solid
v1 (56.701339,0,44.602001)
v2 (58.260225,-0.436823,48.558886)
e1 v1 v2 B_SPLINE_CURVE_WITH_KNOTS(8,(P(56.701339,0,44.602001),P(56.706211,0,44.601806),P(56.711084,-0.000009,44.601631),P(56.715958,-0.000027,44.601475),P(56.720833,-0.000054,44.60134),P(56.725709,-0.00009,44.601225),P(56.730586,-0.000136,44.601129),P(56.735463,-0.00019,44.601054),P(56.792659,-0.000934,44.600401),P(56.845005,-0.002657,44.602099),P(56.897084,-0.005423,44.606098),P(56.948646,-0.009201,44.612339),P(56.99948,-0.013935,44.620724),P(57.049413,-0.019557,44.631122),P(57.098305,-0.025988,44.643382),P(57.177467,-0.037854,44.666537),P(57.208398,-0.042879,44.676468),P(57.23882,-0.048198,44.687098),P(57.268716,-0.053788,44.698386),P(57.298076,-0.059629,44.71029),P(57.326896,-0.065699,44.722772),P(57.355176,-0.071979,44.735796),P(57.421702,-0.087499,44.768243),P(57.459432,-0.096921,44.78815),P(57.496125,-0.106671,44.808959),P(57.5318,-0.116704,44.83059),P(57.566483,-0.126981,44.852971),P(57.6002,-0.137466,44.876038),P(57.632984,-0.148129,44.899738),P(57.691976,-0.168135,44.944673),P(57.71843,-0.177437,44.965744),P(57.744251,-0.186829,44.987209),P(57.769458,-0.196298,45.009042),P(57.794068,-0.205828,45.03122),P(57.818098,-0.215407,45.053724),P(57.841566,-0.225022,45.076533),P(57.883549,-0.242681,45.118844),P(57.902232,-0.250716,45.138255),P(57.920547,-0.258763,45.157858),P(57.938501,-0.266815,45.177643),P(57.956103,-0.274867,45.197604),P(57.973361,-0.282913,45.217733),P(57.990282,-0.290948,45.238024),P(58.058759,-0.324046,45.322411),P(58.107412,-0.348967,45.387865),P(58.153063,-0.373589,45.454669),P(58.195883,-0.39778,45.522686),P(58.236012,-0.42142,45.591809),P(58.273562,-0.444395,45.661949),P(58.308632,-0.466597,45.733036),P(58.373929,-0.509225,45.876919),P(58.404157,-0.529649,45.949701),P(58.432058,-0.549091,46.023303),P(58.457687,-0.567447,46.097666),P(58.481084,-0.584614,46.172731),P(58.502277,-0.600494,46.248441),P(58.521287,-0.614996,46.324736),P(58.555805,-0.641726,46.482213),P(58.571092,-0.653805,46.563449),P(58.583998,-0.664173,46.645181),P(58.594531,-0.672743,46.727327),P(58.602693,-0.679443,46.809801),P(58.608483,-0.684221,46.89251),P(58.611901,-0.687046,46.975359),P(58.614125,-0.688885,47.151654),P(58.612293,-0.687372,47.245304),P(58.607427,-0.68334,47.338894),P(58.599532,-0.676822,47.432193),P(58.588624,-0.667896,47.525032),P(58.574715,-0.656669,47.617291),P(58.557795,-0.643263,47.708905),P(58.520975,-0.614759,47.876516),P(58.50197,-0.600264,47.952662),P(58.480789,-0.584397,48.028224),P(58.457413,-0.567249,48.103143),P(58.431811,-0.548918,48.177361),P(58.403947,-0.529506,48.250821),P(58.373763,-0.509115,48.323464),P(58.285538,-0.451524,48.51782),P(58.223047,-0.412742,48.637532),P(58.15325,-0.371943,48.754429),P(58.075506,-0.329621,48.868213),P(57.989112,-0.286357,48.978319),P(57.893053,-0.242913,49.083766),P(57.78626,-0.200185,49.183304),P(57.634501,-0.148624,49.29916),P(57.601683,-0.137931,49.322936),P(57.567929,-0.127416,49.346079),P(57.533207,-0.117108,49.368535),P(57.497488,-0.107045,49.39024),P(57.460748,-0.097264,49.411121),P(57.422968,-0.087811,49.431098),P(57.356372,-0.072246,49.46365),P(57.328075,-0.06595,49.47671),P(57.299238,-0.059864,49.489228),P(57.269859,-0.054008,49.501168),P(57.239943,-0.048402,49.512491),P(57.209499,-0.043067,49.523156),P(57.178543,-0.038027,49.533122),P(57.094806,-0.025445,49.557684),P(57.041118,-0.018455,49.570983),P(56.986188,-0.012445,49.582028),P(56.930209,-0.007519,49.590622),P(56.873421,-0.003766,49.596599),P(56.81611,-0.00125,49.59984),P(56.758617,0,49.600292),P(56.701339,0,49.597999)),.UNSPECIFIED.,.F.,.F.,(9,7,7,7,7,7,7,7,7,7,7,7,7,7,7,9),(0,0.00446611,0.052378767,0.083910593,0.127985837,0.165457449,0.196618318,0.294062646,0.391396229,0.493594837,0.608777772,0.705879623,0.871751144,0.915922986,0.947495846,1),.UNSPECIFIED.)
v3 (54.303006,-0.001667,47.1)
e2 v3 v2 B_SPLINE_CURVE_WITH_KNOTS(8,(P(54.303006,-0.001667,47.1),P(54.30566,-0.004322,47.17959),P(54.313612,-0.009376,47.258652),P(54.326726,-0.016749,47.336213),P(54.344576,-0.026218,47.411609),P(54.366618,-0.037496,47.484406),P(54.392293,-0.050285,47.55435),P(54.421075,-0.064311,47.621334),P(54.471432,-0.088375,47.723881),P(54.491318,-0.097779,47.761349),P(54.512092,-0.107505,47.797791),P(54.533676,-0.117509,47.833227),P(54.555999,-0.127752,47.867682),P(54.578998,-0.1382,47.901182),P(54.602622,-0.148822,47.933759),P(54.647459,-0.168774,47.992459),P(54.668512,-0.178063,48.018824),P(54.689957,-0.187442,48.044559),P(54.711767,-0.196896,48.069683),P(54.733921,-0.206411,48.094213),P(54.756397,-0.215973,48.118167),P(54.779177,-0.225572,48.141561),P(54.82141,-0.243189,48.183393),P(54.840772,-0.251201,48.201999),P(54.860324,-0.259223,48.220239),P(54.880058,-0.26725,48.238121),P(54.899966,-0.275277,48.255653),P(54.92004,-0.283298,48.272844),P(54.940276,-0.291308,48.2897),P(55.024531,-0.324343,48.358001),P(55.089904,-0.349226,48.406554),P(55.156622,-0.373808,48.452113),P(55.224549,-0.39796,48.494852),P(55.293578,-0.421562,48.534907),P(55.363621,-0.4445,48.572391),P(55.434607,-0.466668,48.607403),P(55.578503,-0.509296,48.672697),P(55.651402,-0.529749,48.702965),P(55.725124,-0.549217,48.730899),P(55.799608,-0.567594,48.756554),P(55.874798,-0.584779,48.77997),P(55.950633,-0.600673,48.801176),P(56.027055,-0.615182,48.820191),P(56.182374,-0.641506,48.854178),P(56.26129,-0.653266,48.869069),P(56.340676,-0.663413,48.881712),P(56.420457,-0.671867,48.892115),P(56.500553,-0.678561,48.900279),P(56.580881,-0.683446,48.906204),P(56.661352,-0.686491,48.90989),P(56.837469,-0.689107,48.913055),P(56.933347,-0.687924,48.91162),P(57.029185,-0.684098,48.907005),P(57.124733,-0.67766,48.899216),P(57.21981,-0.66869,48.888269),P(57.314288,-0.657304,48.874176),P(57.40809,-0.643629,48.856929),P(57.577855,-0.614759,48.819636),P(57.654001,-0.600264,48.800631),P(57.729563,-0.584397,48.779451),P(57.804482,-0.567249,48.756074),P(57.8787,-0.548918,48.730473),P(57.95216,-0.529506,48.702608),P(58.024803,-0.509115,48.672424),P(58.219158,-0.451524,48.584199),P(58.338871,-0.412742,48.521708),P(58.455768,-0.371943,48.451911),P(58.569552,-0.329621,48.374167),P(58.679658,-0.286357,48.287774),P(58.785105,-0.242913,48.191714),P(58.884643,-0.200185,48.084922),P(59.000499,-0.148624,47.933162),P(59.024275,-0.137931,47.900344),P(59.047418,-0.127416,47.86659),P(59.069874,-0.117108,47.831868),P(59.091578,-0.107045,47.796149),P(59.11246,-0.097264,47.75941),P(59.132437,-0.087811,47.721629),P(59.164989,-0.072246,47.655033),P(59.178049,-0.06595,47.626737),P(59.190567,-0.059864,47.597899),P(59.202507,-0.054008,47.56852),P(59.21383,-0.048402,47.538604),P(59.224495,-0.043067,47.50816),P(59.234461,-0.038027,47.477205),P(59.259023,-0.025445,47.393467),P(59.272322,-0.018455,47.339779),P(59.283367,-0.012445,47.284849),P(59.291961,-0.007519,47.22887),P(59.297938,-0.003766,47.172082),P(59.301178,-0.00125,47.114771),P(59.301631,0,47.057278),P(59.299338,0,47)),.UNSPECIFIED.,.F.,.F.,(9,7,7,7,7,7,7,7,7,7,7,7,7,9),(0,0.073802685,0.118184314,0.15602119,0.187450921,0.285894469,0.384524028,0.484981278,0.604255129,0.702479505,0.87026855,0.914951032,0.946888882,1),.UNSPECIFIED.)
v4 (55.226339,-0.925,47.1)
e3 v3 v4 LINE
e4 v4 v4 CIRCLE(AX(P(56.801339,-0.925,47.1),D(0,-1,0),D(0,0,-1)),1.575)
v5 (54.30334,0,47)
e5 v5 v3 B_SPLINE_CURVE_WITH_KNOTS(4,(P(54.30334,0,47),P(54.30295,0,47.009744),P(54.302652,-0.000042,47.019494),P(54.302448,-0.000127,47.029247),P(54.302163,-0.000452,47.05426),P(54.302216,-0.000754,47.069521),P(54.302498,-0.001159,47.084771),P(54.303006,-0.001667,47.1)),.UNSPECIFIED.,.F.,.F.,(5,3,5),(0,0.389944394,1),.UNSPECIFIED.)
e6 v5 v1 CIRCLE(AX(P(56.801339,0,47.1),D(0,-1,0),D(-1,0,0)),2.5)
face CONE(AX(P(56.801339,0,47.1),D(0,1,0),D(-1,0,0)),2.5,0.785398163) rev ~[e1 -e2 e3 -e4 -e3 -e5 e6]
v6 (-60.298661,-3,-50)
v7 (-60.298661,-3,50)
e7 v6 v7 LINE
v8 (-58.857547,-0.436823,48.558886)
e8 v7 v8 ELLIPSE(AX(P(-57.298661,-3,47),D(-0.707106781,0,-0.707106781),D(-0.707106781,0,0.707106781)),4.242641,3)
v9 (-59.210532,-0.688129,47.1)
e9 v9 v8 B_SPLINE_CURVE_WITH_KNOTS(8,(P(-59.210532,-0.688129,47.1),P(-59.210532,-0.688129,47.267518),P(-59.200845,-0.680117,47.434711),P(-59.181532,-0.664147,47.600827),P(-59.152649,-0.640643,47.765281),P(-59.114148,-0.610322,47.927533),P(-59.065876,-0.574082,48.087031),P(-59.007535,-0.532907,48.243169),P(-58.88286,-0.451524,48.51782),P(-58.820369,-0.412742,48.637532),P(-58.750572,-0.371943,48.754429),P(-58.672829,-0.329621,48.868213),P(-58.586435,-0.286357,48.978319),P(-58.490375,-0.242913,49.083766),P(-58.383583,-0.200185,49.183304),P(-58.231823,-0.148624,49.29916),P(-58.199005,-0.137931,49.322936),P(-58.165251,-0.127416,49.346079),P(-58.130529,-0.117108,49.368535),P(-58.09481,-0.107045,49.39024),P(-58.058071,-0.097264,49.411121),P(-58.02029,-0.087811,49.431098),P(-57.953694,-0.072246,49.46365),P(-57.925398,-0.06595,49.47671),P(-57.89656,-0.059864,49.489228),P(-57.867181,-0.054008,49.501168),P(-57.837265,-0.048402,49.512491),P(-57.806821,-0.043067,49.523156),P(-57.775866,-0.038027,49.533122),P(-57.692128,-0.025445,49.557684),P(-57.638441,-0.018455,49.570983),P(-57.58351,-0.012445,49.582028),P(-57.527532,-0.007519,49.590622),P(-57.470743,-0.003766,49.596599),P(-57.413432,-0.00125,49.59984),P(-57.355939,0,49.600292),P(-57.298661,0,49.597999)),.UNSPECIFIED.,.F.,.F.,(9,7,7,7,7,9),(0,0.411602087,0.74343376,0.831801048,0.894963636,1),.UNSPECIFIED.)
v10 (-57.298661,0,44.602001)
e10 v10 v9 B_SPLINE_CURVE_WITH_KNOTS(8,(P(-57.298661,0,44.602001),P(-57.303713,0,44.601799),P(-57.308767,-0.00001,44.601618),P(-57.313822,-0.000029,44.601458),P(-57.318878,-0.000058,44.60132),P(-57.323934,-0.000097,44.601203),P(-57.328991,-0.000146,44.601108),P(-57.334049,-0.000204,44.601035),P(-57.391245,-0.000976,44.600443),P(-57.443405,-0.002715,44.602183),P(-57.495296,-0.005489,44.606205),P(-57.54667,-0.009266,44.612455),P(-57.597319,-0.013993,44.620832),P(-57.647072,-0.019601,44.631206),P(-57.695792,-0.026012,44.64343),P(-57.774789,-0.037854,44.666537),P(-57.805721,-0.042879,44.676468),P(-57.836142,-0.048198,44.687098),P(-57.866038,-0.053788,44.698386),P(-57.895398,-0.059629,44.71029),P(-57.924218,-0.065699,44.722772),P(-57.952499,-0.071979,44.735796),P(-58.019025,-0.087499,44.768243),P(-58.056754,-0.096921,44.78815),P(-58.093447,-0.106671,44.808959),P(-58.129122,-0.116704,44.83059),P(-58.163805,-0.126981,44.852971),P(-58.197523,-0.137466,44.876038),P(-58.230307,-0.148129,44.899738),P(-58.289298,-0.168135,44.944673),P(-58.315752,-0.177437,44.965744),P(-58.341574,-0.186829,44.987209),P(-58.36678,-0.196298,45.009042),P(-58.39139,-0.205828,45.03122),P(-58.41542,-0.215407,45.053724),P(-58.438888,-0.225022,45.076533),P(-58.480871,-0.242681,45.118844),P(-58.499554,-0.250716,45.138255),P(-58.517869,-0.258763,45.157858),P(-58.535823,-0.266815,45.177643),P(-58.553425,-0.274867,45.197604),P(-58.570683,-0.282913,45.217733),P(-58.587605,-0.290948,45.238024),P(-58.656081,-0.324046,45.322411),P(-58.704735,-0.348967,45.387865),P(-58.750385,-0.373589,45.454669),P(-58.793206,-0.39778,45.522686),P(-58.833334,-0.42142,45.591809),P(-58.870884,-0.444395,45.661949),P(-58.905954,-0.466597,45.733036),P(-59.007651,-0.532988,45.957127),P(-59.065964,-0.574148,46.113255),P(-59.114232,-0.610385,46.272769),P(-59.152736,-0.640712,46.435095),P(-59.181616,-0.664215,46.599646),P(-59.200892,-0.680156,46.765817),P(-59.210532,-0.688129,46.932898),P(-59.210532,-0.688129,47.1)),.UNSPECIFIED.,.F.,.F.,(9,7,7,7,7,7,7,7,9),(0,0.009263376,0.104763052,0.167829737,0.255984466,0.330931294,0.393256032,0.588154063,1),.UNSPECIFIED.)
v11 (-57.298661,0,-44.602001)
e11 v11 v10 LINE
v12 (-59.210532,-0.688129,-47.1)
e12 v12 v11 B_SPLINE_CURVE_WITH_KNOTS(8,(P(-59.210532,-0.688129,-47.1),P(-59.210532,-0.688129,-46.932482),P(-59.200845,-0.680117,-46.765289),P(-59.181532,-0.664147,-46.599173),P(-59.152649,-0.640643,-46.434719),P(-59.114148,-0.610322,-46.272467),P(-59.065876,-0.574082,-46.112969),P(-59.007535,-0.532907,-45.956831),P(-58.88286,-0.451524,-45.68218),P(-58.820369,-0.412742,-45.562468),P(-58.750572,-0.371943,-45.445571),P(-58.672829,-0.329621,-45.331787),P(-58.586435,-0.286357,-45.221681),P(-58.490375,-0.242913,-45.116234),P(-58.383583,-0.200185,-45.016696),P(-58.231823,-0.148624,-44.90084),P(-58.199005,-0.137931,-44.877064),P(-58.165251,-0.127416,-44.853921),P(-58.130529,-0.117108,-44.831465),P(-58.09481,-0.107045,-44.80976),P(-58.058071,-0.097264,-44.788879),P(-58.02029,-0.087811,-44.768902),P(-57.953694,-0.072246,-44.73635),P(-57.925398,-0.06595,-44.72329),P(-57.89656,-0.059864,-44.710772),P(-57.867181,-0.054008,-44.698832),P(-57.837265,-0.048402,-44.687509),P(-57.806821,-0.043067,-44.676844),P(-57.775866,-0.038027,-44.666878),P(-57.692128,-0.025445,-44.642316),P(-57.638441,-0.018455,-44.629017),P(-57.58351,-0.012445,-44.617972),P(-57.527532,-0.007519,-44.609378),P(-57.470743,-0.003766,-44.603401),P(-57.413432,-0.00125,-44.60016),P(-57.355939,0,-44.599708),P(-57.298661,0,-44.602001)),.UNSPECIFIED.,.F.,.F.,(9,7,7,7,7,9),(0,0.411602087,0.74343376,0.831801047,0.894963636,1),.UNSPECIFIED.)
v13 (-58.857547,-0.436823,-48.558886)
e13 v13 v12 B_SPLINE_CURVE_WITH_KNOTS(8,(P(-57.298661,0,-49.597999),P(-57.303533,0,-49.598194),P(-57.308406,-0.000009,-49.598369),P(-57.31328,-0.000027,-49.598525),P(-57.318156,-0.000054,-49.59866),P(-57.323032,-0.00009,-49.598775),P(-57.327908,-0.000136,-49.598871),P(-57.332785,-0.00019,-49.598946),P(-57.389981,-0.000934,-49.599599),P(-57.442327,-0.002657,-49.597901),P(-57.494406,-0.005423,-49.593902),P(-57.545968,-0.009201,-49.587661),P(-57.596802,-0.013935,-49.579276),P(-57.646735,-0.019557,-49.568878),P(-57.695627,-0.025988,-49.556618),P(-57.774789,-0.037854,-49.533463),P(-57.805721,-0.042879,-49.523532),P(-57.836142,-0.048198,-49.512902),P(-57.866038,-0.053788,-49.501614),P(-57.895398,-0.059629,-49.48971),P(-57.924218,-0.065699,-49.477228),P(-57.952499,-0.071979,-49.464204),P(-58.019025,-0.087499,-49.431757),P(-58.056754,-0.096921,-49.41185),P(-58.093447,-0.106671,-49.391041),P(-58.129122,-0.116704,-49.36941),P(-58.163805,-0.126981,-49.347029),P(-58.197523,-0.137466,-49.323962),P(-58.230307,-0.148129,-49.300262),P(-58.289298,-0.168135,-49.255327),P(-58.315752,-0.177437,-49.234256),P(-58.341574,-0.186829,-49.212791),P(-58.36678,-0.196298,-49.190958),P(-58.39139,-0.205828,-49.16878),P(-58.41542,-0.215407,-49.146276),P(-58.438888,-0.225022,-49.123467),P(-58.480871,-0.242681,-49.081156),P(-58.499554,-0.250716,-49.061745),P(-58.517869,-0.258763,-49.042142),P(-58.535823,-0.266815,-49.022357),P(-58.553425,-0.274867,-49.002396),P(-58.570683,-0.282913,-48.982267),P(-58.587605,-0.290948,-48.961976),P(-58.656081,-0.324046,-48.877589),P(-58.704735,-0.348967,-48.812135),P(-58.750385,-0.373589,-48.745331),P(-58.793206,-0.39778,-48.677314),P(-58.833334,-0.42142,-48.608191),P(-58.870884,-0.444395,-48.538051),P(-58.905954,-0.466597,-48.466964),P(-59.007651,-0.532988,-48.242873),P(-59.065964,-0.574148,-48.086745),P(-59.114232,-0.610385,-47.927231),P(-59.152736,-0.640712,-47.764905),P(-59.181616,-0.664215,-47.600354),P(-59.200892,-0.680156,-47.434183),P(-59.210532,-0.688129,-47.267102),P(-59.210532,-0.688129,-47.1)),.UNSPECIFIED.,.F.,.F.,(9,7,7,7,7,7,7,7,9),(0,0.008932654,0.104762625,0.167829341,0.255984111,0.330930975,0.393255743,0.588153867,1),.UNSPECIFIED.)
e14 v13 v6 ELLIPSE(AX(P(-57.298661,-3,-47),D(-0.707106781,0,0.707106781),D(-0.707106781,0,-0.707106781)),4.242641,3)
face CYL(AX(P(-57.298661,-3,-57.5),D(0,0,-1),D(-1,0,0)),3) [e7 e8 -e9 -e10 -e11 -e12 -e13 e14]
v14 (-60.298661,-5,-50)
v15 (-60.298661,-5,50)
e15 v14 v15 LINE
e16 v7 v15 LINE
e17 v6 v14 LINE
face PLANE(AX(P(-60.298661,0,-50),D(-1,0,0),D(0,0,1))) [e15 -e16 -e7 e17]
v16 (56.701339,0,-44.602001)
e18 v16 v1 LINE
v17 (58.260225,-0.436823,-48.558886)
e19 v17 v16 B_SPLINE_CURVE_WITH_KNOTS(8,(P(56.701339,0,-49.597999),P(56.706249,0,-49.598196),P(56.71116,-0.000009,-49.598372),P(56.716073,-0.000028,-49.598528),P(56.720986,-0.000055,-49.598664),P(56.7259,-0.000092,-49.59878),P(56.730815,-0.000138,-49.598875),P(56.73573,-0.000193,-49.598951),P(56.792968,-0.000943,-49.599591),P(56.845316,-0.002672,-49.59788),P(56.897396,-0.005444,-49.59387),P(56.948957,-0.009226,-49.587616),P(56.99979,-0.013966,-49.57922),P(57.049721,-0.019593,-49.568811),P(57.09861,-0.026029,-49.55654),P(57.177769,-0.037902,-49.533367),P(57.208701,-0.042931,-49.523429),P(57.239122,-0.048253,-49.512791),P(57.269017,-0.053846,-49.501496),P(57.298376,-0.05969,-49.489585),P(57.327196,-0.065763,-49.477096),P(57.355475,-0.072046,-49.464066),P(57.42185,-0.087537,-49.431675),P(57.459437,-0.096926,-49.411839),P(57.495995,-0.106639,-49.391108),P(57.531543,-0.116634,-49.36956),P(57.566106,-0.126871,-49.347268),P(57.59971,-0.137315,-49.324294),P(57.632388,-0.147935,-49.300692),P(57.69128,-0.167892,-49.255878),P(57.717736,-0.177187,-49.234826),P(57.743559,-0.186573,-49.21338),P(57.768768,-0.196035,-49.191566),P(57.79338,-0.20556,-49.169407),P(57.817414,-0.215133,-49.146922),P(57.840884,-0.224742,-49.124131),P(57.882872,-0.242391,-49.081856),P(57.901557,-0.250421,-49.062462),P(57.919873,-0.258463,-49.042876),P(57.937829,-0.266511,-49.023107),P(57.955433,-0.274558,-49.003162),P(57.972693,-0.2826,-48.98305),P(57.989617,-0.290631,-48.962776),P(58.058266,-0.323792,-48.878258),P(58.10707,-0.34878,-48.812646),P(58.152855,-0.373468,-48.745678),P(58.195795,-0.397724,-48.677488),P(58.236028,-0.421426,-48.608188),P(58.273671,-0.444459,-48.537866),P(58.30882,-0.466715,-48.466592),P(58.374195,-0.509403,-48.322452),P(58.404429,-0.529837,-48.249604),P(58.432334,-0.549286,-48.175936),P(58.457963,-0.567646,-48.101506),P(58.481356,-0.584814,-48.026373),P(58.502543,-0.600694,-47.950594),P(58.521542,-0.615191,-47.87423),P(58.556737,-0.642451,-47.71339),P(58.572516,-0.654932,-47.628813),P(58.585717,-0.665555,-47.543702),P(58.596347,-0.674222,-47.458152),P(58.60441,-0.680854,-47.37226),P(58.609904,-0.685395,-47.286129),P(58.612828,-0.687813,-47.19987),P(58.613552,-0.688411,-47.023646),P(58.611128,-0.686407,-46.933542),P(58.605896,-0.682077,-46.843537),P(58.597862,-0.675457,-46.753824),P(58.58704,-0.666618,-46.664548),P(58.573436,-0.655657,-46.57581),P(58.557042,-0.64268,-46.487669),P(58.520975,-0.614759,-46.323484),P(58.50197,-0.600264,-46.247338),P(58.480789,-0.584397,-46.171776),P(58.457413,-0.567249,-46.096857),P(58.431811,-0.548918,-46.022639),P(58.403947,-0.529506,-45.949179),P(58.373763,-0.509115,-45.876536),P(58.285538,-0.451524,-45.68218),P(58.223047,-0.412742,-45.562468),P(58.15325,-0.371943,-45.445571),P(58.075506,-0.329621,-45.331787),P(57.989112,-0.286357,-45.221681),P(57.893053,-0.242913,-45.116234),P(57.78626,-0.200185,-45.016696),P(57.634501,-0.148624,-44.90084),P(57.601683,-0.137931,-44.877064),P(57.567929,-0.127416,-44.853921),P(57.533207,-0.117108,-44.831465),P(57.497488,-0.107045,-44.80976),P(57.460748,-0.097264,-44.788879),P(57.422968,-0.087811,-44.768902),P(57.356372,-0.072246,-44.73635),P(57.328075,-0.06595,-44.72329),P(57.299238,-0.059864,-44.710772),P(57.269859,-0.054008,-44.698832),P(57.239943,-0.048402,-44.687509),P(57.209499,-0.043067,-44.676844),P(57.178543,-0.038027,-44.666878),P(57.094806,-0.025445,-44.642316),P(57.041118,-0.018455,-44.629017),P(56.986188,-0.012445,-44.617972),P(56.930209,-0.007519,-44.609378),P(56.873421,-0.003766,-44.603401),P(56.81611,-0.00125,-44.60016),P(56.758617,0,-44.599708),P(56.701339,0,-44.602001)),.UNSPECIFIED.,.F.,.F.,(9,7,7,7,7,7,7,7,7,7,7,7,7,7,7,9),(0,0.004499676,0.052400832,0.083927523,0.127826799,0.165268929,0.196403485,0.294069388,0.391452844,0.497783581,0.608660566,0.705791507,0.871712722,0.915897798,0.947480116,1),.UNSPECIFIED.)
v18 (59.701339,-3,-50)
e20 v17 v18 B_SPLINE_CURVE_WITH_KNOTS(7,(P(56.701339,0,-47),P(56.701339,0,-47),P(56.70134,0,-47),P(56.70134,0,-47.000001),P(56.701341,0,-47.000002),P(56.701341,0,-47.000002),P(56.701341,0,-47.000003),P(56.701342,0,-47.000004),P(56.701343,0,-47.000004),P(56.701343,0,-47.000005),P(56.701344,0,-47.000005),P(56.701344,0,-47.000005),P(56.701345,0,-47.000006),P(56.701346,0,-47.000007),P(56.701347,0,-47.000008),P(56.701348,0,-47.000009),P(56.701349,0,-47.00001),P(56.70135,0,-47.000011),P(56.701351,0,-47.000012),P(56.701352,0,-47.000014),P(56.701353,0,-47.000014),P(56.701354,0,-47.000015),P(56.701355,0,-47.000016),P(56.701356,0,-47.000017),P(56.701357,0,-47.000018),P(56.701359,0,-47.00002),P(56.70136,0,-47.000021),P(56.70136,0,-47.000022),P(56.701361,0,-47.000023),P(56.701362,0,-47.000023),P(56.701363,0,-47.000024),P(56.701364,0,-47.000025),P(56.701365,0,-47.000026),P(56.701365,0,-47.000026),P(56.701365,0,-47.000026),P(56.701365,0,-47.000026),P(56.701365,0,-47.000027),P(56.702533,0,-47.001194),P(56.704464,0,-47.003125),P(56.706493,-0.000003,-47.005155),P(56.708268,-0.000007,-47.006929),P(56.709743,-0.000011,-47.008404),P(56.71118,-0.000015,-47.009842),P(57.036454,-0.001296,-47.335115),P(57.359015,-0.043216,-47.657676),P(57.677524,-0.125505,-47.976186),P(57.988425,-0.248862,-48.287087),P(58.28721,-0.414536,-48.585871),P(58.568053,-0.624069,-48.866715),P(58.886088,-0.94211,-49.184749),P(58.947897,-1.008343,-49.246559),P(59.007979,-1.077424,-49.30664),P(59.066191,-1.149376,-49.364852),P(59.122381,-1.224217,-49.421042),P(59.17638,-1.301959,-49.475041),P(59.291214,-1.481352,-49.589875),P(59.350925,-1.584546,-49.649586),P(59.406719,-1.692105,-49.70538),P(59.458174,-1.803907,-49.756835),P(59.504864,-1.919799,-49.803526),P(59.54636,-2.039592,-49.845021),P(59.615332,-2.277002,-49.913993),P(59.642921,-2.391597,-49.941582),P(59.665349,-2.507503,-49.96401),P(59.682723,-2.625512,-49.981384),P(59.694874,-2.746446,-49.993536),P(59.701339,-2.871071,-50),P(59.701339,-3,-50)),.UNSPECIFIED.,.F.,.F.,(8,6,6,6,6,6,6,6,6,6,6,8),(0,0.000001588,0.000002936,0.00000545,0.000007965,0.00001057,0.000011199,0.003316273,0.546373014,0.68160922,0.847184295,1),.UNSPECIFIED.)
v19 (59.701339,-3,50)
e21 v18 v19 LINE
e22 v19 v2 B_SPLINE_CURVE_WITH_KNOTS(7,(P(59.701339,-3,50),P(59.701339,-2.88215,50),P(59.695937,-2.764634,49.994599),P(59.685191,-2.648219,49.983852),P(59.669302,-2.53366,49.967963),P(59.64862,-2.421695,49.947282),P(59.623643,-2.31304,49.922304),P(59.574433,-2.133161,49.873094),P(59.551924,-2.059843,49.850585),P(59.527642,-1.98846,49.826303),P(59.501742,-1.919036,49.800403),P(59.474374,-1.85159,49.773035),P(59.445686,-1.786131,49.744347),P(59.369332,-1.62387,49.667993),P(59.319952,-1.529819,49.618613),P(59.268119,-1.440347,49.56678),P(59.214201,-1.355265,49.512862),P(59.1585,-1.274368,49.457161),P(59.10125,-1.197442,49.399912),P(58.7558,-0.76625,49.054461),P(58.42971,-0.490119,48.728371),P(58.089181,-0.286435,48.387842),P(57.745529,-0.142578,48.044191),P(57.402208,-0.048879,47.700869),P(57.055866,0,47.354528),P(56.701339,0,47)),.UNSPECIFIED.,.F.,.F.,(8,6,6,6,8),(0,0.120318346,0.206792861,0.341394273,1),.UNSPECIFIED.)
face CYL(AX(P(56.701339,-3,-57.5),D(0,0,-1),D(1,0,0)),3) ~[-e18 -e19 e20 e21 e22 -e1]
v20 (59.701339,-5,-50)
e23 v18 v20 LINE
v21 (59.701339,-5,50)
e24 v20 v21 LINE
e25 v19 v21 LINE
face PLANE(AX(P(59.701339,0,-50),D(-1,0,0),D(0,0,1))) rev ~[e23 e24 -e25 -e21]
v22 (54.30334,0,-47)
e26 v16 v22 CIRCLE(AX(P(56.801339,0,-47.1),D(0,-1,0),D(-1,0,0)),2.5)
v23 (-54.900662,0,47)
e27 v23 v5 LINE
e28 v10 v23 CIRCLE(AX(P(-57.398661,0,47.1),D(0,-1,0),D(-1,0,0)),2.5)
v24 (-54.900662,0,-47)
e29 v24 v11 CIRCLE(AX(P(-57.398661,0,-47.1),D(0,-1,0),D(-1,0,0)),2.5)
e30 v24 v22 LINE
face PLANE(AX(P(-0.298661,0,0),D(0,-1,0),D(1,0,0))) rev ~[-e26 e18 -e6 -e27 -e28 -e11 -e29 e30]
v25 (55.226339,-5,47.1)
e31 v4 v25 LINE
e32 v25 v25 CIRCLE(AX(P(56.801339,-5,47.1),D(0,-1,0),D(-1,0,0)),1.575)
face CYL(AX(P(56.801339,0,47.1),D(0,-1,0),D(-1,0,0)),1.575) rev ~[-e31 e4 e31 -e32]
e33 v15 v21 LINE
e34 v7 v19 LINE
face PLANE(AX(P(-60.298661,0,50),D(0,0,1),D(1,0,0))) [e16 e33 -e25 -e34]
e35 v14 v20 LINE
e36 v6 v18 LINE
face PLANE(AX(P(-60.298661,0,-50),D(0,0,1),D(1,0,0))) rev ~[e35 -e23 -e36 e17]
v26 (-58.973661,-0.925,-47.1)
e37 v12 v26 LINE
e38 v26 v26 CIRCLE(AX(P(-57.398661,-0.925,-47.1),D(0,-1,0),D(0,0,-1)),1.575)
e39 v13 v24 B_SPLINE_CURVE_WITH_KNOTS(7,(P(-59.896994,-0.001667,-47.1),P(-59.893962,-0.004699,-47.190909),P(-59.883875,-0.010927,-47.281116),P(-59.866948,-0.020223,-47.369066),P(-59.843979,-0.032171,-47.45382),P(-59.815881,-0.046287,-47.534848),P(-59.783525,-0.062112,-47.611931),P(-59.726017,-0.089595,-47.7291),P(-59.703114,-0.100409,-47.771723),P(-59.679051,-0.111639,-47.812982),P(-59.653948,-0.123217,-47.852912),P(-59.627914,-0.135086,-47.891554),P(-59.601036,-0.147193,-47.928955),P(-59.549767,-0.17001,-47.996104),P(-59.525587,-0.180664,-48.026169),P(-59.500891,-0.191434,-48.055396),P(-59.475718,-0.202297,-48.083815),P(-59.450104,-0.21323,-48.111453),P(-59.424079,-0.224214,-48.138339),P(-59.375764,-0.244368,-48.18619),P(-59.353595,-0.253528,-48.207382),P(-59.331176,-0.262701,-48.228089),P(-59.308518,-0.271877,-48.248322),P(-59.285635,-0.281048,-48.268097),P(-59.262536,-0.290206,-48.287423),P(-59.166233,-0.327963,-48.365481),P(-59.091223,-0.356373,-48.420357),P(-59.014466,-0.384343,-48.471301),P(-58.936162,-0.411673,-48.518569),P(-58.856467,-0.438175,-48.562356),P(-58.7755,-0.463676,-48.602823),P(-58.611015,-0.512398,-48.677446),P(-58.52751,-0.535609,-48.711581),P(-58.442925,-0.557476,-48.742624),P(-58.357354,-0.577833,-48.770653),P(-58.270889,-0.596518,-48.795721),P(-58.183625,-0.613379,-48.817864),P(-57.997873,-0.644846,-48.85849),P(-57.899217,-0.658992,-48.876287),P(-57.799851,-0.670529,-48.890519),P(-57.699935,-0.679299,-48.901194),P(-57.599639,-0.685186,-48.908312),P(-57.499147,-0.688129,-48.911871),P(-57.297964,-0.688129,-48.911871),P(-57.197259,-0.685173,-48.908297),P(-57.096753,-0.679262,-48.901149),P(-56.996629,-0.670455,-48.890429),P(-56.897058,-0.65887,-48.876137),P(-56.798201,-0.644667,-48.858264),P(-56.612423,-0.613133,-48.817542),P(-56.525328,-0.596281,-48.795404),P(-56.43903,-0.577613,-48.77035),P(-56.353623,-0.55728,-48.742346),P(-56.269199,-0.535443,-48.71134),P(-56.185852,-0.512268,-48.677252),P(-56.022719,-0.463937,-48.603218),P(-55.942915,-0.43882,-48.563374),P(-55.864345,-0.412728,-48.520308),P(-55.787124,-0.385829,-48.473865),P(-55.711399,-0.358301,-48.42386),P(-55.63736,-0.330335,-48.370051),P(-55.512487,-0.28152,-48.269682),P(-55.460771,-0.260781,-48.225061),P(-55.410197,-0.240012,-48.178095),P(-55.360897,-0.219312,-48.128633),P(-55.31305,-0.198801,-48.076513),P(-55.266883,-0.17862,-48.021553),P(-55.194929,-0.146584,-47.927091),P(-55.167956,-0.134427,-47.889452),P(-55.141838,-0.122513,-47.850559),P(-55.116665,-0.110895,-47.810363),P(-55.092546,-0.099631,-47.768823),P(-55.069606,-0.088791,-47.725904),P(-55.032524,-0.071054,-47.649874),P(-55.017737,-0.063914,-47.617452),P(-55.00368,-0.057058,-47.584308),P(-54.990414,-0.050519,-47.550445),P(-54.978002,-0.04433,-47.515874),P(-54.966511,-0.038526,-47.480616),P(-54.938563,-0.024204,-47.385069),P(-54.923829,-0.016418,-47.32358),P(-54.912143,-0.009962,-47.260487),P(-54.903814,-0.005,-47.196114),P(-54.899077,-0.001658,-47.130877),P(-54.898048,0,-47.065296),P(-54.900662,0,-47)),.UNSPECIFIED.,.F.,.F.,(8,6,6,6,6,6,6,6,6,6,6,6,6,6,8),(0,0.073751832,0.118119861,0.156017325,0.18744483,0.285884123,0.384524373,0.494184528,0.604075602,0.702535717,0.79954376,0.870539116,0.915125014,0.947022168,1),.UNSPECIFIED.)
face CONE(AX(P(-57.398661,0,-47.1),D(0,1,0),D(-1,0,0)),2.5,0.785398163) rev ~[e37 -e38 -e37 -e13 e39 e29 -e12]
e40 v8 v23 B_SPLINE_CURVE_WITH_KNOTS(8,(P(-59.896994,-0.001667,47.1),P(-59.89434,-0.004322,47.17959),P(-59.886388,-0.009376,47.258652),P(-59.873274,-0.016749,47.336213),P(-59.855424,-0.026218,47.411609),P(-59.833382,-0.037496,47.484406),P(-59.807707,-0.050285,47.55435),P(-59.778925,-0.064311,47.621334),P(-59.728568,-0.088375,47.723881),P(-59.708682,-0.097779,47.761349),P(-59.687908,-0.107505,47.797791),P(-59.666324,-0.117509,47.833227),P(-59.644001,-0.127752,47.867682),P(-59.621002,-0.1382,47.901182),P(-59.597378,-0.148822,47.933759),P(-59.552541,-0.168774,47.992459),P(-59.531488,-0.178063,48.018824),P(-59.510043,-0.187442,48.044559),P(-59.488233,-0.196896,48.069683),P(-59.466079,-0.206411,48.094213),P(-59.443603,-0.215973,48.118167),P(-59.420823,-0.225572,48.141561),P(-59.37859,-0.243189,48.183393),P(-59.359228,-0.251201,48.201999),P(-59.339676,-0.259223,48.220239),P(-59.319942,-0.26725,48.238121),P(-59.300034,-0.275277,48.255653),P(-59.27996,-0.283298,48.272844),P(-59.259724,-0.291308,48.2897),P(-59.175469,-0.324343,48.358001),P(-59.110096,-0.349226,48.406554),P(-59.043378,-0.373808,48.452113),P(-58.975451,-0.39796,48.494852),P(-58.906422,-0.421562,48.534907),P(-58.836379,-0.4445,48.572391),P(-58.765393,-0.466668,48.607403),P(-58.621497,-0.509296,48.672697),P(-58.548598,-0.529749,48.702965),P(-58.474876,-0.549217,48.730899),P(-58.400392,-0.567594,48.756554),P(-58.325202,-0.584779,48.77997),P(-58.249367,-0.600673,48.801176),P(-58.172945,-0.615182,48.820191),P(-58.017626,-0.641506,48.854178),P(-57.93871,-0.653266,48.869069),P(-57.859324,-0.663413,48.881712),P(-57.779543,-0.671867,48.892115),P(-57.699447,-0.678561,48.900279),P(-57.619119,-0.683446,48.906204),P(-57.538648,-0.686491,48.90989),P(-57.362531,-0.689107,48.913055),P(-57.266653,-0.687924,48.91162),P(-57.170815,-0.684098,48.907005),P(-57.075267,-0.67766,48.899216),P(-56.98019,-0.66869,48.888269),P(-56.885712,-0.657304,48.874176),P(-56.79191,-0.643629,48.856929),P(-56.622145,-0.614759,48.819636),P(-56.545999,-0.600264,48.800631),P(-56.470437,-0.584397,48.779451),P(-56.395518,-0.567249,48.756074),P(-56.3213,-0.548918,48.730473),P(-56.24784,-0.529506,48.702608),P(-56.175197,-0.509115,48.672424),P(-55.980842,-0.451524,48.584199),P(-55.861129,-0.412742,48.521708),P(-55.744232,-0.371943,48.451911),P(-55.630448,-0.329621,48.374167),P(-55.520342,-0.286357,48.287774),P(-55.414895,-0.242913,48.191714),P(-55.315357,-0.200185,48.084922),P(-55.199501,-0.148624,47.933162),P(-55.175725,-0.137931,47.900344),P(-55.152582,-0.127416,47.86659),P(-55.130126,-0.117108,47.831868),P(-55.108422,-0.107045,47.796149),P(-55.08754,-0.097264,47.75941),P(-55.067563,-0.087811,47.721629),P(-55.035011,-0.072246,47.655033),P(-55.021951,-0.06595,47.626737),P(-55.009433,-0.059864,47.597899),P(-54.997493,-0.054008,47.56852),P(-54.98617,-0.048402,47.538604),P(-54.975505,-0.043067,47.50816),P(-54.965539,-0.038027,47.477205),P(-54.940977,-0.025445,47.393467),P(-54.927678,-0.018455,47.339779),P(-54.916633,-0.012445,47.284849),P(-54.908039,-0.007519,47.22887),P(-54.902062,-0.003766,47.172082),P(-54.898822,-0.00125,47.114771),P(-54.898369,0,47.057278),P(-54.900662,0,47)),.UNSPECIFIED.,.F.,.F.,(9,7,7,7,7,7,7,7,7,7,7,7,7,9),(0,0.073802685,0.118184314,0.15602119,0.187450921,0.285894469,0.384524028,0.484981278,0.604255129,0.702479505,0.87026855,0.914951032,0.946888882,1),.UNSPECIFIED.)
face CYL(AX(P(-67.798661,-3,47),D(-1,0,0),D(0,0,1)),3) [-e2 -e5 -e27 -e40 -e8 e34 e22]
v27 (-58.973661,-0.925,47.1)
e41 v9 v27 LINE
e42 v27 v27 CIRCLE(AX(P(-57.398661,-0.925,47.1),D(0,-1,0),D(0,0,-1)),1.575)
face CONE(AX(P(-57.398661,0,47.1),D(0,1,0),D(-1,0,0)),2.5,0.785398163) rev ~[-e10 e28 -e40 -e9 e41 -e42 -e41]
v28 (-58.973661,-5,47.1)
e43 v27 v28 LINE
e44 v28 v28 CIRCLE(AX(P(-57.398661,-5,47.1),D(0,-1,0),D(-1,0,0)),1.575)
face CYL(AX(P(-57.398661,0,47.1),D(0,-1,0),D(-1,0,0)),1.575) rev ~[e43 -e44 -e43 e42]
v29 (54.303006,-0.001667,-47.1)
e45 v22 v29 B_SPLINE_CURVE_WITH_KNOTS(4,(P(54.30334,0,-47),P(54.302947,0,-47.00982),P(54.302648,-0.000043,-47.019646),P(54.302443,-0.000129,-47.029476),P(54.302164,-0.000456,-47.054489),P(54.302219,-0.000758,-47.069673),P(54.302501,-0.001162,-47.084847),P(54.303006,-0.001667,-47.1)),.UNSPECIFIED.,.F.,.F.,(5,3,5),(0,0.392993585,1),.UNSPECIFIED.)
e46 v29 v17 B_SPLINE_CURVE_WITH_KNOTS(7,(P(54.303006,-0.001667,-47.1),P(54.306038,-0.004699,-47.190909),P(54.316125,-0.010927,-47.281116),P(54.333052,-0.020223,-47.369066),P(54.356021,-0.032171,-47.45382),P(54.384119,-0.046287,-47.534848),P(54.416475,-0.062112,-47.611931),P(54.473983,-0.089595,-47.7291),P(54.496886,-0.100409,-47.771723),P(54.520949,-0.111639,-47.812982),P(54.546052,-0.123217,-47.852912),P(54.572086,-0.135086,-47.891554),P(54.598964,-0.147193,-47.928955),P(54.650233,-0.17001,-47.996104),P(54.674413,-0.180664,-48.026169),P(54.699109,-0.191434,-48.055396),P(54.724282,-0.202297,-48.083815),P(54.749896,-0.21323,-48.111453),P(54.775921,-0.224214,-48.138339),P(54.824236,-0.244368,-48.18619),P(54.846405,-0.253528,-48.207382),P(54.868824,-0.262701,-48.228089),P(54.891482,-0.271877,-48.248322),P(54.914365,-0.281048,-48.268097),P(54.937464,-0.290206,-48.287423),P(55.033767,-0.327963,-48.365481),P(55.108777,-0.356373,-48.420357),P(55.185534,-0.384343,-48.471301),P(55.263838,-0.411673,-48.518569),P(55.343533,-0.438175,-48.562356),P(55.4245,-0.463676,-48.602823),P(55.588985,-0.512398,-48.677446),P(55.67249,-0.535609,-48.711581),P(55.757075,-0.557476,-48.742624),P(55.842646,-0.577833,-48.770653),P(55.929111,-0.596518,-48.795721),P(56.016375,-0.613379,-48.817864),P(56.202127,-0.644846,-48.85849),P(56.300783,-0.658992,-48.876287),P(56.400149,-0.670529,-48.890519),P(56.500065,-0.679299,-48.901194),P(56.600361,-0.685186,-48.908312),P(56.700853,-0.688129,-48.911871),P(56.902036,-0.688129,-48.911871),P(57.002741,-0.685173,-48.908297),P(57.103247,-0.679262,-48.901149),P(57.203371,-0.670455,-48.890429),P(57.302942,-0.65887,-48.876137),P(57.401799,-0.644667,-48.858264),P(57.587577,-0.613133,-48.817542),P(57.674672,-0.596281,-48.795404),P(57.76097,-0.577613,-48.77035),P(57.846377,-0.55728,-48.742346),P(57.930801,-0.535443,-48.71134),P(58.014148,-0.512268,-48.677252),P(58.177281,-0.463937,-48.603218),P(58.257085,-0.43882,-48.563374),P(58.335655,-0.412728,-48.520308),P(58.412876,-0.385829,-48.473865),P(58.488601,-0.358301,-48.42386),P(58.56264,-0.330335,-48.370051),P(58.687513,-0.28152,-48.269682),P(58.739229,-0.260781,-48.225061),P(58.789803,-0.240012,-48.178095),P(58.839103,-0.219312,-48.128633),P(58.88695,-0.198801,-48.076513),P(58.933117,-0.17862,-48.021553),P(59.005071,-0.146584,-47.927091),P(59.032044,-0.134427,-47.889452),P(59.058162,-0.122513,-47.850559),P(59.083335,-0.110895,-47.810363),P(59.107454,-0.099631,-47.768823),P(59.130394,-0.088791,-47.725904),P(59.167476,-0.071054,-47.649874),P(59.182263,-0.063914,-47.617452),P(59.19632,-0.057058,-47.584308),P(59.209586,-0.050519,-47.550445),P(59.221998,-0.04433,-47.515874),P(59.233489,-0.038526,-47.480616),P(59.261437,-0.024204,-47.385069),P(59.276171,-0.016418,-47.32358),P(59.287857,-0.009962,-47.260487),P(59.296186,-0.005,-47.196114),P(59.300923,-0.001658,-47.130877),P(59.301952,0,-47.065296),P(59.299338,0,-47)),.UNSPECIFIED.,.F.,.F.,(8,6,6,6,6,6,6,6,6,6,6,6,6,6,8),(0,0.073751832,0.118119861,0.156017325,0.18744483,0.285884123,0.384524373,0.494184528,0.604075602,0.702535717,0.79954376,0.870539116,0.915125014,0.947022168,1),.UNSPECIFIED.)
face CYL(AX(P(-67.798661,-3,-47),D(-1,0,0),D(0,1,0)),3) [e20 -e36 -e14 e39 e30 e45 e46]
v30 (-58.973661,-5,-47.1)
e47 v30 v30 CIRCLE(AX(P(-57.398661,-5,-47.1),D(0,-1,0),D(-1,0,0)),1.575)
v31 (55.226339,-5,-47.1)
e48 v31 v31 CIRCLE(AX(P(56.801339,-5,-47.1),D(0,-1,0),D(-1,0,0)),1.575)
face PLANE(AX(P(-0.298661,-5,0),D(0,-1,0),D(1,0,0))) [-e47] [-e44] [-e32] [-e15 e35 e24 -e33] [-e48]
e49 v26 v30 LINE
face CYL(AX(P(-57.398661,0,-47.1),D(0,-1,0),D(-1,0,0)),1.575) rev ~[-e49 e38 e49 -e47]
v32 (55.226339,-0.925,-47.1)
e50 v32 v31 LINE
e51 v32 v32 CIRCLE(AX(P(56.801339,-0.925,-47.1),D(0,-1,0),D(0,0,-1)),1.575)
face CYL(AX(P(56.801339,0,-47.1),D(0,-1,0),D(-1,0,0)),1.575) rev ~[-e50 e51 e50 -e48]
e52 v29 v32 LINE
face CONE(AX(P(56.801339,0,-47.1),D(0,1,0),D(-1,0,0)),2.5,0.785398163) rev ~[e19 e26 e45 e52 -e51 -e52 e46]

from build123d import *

# Parameters (mm, degrees)
F0_W           = 120
F0_H           = 100
F1_DEPTH       = 5
F2_D           = 3.15
F2_CSINK_D     = 5
F2_CSINK_ANGLE = 90
F3_T1_DEPTH    = 135
F3_T3_DEPTH    = 115


# Not quite as in the source:
# - a fillet or chamfer that OpenCascade refuses, or shapes differently, is made with other operations: its cross-section is extruded or revolved along the edge and cut away or added


with BuildPart() as f1:
    # F0 (on Front) → F1 (new body)
    with BuildSketch(Plane.XZ):
        with Locations((-0.298661174, 0)):
            Rectangle(F0_W, F0_H)
    extrude(amount=F1_DEPTH)

    # F2 (through all)
    with Locations(Plane(origin=(0, 0, 0), x_dir=(1, 0, 0), z_dir=(0, 1, 0))):
        with Locations((-57.398661174, -47.1), (56.801338826, -47.1), (56.801338826, 47.1), (-57.398661174, 47.1)):
            CounterSinkHole(F2_D / 2, F2_CSINK_D / 2, counter_sink_angle=F2_CSINK_ANGLE)

    # F3: fillet of radius 3 on 4 edges, made by hand

    # F3_s2 → F3_t1 (cut)
    with BuildSketch(Plane.YZ.offset(-67.798661174)):
        with BuildLine():
            ThreePointArc((0, -47), (-0.8786796564, -49.1213203436), (-3, -50))
            Line((-3, -50), (0, -50))
            Line((0, -50), (0, -47))
        make_face()
        with BuildLine():
            ThreePointArc((-3, 50), (-0.8786796564, 49.1213203436), (0, 47))
            Line((0, 47), (0, 50))
            Line((0, 50), (-3, 50))
        make_face()
    extrude(amount=F3_T1_DEPTH, mode=Mode.SUBTRACT)

    # F3_s4 → F3_t3 (cut)
    with BuildSketch(Plane.XY.offset(-57.5)):
        with BuildLine():
            ThreePointArc((59.701338826, -3), (58.8226591695, -0.8786796564), (56.701338826, 0))
            Line((56.701338826, 0), (59.701338826, 0))
            Line((59.701338826, 0), (59.701338826, -3))
        make_face()
        with BuildLine():
            ThreePointArc((-60.298661174, -3), (-59.4199815176, -0.8786796564), (-57.298661174, 0))
            Line((-57.298661174, 0), (-60.298661174, 0))
            Line((-60.298661174, 0), (-60.298661174, -3))
        make_face()
    extrude(amount=F3_T3_DEPTH, mode=Mode.SUBTRACT)


solid = f1.part
